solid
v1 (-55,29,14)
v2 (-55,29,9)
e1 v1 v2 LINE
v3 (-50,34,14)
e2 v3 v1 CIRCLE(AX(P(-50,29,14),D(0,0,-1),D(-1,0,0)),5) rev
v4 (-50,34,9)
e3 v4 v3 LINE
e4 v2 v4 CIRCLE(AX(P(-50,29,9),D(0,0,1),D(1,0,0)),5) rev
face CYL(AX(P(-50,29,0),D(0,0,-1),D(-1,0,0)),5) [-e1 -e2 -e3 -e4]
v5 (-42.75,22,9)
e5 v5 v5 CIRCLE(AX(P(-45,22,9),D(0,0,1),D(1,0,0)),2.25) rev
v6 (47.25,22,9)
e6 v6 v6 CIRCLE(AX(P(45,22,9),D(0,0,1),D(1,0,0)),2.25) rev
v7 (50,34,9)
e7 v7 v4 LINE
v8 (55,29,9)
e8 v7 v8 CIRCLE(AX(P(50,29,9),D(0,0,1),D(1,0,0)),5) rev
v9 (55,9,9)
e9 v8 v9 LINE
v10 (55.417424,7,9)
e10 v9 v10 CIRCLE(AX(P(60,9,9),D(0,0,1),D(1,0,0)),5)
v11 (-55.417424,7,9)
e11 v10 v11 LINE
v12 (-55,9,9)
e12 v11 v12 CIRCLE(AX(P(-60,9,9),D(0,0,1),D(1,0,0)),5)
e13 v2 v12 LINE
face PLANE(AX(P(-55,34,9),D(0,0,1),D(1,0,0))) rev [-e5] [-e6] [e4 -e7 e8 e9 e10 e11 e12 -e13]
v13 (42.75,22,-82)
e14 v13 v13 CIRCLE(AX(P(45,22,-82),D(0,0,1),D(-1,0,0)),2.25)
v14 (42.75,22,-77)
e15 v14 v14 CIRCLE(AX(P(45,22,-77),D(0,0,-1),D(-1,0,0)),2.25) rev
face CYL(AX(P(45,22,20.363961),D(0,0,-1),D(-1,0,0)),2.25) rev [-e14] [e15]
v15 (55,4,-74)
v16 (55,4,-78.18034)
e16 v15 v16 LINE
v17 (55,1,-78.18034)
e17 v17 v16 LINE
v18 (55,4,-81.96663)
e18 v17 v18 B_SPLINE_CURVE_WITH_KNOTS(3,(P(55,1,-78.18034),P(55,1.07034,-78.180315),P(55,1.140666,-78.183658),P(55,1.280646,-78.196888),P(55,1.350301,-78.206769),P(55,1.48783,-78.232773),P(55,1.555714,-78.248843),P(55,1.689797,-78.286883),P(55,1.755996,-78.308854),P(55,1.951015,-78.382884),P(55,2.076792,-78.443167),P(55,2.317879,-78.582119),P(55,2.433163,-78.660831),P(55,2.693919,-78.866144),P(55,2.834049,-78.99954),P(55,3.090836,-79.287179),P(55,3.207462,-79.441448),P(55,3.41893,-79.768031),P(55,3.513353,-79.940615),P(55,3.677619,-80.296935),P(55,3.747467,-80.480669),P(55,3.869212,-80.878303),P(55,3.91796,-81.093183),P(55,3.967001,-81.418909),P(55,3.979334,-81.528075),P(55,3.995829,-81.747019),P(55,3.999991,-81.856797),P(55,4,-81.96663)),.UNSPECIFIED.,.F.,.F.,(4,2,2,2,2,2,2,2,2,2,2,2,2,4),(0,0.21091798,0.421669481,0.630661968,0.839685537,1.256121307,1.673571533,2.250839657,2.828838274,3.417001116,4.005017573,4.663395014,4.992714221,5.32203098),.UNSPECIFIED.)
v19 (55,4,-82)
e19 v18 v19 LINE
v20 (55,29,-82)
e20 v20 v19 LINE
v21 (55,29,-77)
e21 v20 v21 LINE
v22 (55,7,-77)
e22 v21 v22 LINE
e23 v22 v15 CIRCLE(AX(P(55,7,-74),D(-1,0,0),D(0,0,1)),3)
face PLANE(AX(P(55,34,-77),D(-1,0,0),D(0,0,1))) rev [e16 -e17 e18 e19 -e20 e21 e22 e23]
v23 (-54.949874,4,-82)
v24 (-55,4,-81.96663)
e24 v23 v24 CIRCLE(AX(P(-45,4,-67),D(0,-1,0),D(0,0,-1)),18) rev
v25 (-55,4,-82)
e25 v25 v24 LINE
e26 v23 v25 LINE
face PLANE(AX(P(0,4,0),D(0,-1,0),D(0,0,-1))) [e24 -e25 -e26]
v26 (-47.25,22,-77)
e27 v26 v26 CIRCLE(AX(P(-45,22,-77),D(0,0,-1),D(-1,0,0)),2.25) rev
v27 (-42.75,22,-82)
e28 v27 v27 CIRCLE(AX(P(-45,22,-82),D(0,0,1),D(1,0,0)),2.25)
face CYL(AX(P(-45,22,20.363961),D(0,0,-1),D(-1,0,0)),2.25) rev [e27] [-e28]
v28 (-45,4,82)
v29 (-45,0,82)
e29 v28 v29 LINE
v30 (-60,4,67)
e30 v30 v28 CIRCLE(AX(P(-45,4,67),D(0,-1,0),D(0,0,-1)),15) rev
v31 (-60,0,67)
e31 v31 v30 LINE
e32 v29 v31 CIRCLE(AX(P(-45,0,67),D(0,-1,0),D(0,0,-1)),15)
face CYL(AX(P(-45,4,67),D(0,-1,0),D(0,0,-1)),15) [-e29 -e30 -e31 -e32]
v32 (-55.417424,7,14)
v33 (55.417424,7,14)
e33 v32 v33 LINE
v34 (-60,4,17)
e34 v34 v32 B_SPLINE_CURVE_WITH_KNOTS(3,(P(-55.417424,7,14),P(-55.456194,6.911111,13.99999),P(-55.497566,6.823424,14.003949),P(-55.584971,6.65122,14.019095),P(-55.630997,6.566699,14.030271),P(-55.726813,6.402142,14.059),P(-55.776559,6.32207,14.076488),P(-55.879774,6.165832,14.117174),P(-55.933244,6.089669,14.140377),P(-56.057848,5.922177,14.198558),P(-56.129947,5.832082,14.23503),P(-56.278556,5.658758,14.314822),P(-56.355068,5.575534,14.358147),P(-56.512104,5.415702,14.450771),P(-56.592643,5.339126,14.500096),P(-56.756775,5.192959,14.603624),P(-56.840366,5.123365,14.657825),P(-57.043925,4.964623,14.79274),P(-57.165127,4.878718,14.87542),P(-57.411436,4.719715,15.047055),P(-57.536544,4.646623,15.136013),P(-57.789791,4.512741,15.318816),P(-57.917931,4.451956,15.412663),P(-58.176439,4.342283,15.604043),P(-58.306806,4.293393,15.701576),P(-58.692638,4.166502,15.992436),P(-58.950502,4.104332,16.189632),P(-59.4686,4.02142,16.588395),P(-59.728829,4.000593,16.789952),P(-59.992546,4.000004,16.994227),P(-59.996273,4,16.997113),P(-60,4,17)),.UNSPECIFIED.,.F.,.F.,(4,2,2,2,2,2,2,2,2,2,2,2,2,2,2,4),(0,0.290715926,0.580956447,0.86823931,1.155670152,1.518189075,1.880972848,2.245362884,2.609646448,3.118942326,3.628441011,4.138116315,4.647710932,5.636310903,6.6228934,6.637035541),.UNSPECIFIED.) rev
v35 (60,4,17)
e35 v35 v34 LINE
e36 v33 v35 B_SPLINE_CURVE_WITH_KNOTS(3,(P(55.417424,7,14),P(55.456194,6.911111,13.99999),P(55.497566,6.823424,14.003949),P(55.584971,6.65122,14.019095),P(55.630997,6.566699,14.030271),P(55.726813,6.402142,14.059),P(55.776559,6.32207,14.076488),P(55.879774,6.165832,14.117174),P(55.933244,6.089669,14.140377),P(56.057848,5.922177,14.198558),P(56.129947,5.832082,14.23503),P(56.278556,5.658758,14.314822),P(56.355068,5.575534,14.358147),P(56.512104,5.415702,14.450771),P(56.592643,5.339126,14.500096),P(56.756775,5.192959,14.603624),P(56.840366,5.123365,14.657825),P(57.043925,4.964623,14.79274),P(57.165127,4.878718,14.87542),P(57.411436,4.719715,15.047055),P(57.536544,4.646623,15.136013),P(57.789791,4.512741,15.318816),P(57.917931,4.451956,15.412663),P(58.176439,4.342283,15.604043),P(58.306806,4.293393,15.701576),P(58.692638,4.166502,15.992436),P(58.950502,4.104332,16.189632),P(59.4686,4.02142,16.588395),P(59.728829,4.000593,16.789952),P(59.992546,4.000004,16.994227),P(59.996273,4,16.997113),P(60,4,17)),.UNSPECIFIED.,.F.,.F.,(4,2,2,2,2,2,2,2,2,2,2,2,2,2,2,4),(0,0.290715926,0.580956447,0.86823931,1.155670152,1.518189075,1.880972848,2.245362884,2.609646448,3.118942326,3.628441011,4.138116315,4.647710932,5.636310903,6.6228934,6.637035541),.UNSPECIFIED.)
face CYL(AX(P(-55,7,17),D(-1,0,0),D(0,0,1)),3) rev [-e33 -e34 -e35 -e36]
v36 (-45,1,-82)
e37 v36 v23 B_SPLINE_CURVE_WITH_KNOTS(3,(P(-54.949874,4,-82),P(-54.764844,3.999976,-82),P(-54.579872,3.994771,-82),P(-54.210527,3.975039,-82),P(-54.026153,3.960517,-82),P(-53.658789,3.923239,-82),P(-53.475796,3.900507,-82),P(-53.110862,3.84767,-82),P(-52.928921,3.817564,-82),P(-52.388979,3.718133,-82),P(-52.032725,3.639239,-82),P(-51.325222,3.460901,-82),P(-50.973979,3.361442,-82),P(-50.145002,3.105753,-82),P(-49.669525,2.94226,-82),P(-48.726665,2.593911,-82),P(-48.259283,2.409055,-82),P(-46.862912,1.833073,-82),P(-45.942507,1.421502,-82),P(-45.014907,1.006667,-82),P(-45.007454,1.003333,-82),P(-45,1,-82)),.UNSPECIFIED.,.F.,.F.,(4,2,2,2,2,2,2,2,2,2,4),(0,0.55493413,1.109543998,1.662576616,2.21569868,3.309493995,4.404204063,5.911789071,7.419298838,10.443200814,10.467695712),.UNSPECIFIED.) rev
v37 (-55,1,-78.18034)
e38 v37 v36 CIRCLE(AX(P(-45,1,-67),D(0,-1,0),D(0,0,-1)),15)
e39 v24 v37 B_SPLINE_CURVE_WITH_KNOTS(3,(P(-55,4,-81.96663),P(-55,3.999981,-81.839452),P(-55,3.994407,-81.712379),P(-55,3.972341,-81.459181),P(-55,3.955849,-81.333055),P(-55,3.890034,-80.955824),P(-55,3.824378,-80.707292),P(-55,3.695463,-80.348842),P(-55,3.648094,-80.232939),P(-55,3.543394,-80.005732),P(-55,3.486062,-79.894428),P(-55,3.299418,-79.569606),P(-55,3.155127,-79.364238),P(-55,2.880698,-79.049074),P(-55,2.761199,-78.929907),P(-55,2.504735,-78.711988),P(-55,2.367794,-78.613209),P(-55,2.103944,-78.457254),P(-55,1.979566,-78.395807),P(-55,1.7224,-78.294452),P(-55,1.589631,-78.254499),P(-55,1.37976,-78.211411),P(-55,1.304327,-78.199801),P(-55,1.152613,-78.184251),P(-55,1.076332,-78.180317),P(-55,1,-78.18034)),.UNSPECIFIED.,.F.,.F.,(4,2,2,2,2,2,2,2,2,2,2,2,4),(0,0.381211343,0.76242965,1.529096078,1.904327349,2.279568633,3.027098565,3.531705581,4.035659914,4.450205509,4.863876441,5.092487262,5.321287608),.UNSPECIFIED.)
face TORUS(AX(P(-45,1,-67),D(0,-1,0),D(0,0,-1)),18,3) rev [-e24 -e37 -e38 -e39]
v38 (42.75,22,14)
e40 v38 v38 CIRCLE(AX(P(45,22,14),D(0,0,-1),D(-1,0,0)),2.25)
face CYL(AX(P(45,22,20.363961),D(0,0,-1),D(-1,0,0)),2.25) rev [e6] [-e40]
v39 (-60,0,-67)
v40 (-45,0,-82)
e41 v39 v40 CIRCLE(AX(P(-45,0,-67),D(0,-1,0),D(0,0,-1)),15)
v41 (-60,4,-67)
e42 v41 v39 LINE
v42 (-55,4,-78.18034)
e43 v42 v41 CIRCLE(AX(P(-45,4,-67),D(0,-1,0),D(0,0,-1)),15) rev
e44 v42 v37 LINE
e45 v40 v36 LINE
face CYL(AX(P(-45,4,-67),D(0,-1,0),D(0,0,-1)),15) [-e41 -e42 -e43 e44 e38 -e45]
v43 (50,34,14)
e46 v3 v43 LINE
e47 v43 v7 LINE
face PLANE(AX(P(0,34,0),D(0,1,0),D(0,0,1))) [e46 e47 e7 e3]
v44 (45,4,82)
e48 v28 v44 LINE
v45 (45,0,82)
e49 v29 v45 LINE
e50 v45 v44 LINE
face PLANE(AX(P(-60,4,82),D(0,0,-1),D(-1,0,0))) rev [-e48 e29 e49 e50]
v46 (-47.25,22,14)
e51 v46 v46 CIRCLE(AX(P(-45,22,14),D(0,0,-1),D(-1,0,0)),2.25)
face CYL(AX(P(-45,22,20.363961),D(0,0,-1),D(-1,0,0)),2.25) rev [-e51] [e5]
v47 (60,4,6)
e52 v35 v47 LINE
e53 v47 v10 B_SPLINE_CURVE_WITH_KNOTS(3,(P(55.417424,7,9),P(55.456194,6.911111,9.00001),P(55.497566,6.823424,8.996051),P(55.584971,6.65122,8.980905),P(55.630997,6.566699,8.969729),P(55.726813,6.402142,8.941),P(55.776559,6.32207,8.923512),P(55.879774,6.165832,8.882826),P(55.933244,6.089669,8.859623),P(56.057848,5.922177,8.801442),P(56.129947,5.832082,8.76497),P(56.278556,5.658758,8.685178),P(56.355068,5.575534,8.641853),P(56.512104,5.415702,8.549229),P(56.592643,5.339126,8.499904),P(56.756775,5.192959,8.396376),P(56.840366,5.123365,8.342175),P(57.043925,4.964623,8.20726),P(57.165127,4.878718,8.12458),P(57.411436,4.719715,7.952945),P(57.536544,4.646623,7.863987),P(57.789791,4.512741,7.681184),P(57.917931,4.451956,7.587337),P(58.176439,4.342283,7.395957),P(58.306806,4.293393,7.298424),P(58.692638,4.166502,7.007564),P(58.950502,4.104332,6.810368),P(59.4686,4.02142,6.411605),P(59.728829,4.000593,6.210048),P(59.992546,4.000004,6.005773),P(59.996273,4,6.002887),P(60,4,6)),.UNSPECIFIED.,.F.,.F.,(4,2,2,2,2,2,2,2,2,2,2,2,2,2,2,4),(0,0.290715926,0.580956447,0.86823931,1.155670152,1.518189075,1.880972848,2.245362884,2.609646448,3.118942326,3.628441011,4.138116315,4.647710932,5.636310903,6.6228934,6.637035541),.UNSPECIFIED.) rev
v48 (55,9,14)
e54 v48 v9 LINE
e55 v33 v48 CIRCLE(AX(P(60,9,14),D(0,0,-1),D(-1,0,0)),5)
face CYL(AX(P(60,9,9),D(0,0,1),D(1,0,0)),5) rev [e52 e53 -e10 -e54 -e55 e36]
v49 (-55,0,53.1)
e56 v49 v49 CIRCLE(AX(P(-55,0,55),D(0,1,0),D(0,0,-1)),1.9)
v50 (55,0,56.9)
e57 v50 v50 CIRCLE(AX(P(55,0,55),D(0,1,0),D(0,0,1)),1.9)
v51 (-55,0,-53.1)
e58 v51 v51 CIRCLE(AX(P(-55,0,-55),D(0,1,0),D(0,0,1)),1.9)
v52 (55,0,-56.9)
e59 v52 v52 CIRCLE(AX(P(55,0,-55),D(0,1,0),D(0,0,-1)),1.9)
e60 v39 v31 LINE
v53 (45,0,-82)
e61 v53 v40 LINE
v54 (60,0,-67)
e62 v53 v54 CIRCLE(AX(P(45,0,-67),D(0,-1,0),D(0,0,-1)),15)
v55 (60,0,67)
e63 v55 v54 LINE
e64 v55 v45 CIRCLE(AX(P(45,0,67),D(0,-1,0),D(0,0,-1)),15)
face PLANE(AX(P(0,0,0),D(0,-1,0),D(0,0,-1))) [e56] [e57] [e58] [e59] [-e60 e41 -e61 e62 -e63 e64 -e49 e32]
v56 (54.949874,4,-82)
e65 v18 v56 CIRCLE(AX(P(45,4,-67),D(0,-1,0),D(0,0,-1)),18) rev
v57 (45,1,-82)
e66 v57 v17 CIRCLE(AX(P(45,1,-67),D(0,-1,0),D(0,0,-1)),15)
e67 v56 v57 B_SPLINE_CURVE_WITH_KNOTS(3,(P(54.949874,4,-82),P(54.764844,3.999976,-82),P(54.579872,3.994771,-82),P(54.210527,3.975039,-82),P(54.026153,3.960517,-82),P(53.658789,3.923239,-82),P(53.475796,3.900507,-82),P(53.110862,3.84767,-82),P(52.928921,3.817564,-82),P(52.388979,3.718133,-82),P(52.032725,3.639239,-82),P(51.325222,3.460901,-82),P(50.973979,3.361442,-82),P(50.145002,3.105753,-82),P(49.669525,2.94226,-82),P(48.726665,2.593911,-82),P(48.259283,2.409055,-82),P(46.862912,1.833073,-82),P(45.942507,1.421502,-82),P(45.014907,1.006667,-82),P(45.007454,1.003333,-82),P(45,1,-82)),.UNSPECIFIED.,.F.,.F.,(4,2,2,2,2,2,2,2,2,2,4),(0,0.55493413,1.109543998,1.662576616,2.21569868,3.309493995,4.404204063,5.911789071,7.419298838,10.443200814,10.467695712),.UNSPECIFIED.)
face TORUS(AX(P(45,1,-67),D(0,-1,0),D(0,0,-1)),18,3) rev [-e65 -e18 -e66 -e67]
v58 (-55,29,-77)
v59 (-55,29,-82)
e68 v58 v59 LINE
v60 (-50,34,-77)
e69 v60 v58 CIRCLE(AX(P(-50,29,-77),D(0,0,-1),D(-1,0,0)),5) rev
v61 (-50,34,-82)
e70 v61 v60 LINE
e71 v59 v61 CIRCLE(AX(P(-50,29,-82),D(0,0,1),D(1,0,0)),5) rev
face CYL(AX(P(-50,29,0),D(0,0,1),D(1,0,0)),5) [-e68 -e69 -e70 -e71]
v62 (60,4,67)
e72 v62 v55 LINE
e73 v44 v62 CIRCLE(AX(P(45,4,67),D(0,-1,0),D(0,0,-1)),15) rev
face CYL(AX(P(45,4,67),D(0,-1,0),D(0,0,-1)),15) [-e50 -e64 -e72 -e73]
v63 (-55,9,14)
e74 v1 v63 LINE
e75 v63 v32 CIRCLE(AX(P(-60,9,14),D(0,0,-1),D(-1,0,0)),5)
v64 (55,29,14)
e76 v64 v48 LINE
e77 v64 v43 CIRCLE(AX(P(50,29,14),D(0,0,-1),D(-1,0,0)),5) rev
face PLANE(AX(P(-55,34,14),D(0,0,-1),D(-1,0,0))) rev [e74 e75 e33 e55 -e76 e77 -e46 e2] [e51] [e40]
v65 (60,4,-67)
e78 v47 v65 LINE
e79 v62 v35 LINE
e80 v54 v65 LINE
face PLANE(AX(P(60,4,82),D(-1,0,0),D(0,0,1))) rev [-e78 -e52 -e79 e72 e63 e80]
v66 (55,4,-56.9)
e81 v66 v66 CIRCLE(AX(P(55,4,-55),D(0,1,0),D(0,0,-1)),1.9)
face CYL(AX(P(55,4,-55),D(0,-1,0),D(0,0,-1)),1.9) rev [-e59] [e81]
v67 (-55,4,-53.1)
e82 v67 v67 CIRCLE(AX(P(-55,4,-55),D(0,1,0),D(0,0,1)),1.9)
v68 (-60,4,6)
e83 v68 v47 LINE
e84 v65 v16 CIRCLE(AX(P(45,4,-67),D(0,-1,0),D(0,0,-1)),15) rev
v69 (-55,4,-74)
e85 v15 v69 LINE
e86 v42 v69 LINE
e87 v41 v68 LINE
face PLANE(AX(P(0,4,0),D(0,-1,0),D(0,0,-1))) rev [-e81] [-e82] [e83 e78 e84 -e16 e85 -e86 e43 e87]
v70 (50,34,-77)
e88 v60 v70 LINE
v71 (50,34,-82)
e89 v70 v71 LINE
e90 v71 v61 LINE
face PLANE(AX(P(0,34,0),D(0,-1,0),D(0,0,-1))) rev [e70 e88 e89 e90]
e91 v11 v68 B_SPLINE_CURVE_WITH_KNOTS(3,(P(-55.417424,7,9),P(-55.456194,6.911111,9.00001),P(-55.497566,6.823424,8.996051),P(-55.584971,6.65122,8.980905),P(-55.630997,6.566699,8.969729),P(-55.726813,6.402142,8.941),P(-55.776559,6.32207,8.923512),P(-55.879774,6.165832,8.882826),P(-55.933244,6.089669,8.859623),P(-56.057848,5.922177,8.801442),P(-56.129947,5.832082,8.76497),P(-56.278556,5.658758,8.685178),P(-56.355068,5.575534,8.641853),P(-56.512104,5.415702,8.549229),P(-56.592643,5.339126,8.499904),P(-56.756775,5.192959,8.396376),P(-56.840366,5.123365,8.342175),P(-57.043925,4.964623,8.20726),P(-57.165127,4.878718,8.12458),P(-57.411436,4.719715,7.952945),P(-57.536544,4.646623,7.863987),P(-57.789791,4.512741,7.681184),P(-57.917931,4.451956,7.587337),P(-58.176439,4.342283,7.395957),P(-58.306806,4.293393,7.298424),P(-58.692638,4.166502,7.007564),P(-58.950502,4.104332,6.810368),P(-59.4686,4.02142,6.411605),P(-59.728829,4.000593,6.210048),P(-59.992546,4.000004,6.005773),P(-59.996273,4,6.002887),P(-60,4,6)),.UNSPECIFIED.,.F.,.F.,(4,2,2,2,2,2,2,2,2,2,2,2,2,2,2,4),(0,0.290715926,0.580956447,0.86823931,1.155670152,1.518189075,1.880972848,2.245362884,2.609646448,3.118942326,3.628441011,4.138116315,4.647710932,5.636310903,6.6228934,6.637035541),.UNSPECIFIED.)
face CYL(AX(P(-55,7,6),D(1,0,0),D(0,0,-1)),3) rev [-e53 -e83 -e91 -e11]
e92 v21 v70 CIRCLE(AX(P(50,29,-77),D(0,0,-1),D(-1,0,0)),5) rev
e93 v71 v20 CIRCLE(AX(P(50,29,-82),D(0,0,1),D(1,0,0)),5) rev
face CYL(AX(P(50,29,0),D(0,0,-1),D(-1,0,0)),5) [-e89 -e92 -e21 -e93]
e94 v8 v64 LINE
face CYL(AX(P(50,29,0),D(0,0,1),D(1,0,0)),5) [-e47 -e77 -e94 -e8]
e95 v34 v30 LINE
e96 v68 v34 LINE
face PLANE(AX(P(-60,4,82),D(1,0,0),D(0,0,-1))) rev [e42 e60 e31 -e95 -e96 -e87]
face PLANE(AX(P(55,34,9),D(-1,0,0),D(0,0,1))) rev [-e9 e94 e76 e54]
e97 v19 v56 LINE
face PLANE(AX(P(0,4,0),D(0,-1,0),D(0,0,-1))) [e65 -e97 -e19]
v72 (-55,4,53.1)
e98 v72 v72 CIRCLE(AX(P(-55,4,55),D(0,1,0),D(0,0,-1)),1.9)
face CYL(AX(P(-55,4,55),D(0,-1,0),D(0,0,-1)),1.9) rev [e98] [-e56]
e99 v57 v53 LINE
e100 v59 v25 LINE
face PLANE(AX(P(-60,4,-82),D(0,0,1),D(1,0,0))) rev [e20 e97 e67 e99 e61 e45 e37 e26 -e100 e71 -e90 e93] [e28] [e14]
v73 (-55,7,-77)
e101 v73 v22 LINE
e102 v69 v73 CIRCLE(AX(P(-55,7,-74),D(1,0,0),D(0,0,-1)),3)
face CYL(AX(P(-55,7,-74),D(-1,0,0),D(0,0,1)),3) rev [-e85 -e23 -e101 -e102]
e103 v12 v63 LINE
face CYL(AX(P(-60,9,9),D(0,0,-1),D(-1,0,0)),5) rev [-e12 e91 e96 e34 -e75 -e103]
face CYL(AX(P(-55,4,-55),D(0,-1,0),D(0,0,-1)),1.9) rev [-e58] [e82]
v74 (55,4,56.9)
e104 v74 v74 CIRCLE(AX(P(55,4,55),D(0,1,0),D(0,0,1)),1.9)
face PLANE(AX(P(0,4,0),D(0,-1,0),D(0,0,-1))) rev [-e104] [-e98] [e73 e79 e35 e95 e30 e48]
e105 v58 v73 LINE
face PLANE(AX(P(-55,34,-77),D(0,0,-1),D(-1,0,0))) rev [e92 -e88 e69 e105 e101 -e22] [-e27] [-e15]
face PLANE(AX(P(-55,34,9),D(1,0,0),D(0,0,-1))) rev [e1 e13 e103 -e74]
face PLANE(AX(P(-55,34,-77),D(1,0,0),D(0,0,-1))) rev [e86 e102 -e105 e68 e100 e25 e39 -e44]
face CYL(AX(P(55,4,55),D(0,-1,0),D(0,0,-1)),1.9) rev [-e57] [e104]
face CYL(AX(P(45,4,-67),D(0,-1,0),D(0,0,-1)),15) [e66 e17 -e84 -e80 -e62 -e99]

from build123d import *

# Parameters (mm, degrees)
SKETCH_1_W          = 120
SKETCH_1_H          = 164
SKETCH_1_R          = 1.9
EXTRUDE_1_DEPTH     = 4
FILLET_1_R          = 15
SKETCH_2_W          = 110
SKETCH_2_H          = 5
EXTRUDE_2_DEPTH     = 30
CUT_EXTRUDE_1_REACH = 179.91
SKETCH_3_R          = 2.25
FILLET_2_R          = 5
FILLET_3_R          = 3
FILLET_4_R          = 3


# Some blends are built 0.0001 mm under size
with BuildPart() as part:
    # Эскиз1 → Бобышка-Вытянуть1 (new body)
    with BuildSketch(Plane(origin=(0, 0, 0), x_dir=(1, 0, 0), z_dir=(0, 1, 0))):
        Rectangle(SKETCH_1_W, SKETCH_1_H)
        with Locations(Location((-55, 55, 0), (0, 0, 270))):
            Circle(SKETCH_1_R, mode=Mode.SUBTRACT)
        with Locations(Location((55, 55, 0), (0, 0, 90))):
            Circle(SKETCH_1_R, mode=Mode.SUBTRACT)
        with Locations(Location((55, -55, 0), (0, 0, 270))):
            Circle(SKETCH_1_R, mode=Mode.SUBTRACT)
        with Locations(Location((-55, -55, 0), (0, 0, 90))):
            Circle(SKETCH_1_R, mode=Mode.SUBTRACT)
    extrude(amount=EXTRUDE_1_DEPTH)

    # Скругление1
    fillet_1_edges = [part.edges().sort_by_distance(p)[0] for p in [
        (60, 2, 82),
        (-60, 2, 82),
        (-60, 2, -82),
        (60, 2, -82),
    ]]
    fillet(fillet_1_edges, radius=FILLET_1_R)

    # Эскиз2 → Бобышка-Вытянуть2 (add)
    with BuildSketch(Plane(origin=(0, 4, 0), x_dir=(1, 0, 0), z_dir=(0, 1, 0))):
        with Locations((0, 79.5)):
            Rectangle(SKETCH_2_W, SKETCH_2_H)
        with Locations((0, -11.5)):
            Rectangle(SKETCH_2_W, SKETCH_2_H)
    extrude(amount=EXTRUDE_2_DEPTH)

    # Вырез-Вытянуть1: up to this face of the body (flat: up to its plane)
    cut_extrude_1_end = Plane(part.part.faces().sort_by_distance((0, 19, 14))[0])
    # Эскиз3 → Вырез-Вытянуть1 (cut, up to the picked face)
    with BuildSketch(Plane.XY.offset(-82), mode=Mode.PRIVATE) as cut_extrude_1_sk1:
        with Locations(Location((-45, 22, 0), (0, 0, 180))):
            Circle(SKETCH_3_R)
    cut_extrude_1_tool1 = split(extrude(cut_extrude_1_sk1.sketch, amount=CUT_EXTRUDE_1_REACH, mode=Mode.PRIVATE), bisect_by=cut_extrude_1_end, keep=Keep.BOTH, mode=Mode.PRIVATE)
    # Эскиз3 → Вырез-Вытянуть1 (cut, up to the picked face)
    with BuildSketch(Plane.XY.offset(-82), mode=Mode.PRIVATE) as cut_extrude_1_sk2:
        with Locations(Location((45, 22, 0), (0, 0, 180))):
            Circle(SKETCH_3_R)
    cut_extrude_1_tool2 = split(extrude(cut_extrude_1_sk2.sketch, amount=CUT_EXTRUDE_1_REACH, mode=Mode.PRIVATE), bisect_by=cut_extrude_1_end, keep=Keep.BOTH, mode=Mode.PRIVATE)
    add(cut_extrude_1_tool1.solids().sort_by(Axis((-45, 22, -82), (0, 0, 1)))[0], mode=Mode.SUBTRACT)
    add(cut_extrude_1_tool2.solids().sort_by(Axis((45, 22, -82), (0, 0, 1)))[0], mode=Mode.SUBTRACT)

    # Скругление2
    fillet_2_edges = [part.edges().sort_by_distance(p)[0] for p in [
        (55, 34, -79.5),
        (-55, 34, -79.5),
        (-55, 4, 11.5),
        (55, 4, 11.5),
        (-55, 34, 11.5),
        (55, 34, 11.5),
    ]]
    fillet(fillet_2_edges, radius=FILLET_2_R - 0.0001)  # a hair under: the kernel refuses the full size

    # Скругление3
    fillet_3_edges = [part.edges().sort_by_distance(p)[0] for p in [
        (0, 4, -77),
        (0, 4, 14),
        (0, 4, 9),
    ]]
    fillet(fillet_3_edges, radius=FILLET_3_R)

    # Скругление4
    # the kernel refuses this fillet: 3 mm, written as the material it adds along each edge
    with BuildSketch(Plane(origin=(-45, 4, -67), x_dir=(0.7513290268597076, 0, -0.659927794079053), z_dir=(0.659927794079053, 0, 0.7513290268597076))) as fillet_4_piece_1_section:
        with BuildLine():
            CenterArc((15 + FILLET_4_R, -FILLET_4_R), FILLET_4_R, 90, 90)
            Line((15, -FILLET_4_R), (15, 0))
            Line((15, 0), (15 + FILLET_4_R, 0))
        make_face()
    fillet_4_piece_1 = revolve(axis=Axis((-45, 4, -67), (0, 1, 0)), revolution_arc=119.166321534, mode=Mode.PRIVATE)
    fillet_4_piece_1 = split(fillet_4_piece_1, bisect_by=Plane(origin=(-45, 4, -82), z_dir=(0, 0, 1)), keep=Keep.TOP, mode=Mode.PRIVATE)
    fillet_4_piece_1 = split(fillet_4_piece_1, bisect_by=Plane(origin=(-55, 4, -67), z_dir=(1, 0, 0)), keep=Keep.TOP, mode=Mode.PRIVATE)
    add(fillet_4_piece_1)
    with BuildSketch(Plane(origin=(45, 4, -67), x_dir=(0.9424122347792039, 0, -0.33445355393307824), z_dir=(0.33445355393307824, 0, 0.9424122347792039))) as fillet_4_piece_2_section:
        with BuildLine():
            CenterArc((15 + FILLET_4_R, -FILLET_4_R), FILLET_4_R, 90, 90)
            Line((15, -FILLET_4_R), (15, 0))
            Line((15, 0), (15 + FILLET_4_R, 0))
        make_face()
    fillet_4_piece_2 = revolve(axis=Axis((45, 4, -67), (0, 1, 0)), revolution_arc=119.166321534, mode=Mode.PRIVATE)
    fillet_4_piece_2 = split(fillet_4_piece_2, bisect_by=Plane(origin=(45, 4, -82), z_dir=(0, 0, 1)), keep=Keep.TOP, mode=Mode.PRIVATE)
    fillet_4_piece_2 = split(fillet_4_piece_2, bisect_by=Plane(origin=(55, 4, -67), z_dir=(-1, 0, 0)), keep=Keep.TOP, mode=Mode.PRIVATE)
    add(fillet_4_piece_2)


solid = part.part
